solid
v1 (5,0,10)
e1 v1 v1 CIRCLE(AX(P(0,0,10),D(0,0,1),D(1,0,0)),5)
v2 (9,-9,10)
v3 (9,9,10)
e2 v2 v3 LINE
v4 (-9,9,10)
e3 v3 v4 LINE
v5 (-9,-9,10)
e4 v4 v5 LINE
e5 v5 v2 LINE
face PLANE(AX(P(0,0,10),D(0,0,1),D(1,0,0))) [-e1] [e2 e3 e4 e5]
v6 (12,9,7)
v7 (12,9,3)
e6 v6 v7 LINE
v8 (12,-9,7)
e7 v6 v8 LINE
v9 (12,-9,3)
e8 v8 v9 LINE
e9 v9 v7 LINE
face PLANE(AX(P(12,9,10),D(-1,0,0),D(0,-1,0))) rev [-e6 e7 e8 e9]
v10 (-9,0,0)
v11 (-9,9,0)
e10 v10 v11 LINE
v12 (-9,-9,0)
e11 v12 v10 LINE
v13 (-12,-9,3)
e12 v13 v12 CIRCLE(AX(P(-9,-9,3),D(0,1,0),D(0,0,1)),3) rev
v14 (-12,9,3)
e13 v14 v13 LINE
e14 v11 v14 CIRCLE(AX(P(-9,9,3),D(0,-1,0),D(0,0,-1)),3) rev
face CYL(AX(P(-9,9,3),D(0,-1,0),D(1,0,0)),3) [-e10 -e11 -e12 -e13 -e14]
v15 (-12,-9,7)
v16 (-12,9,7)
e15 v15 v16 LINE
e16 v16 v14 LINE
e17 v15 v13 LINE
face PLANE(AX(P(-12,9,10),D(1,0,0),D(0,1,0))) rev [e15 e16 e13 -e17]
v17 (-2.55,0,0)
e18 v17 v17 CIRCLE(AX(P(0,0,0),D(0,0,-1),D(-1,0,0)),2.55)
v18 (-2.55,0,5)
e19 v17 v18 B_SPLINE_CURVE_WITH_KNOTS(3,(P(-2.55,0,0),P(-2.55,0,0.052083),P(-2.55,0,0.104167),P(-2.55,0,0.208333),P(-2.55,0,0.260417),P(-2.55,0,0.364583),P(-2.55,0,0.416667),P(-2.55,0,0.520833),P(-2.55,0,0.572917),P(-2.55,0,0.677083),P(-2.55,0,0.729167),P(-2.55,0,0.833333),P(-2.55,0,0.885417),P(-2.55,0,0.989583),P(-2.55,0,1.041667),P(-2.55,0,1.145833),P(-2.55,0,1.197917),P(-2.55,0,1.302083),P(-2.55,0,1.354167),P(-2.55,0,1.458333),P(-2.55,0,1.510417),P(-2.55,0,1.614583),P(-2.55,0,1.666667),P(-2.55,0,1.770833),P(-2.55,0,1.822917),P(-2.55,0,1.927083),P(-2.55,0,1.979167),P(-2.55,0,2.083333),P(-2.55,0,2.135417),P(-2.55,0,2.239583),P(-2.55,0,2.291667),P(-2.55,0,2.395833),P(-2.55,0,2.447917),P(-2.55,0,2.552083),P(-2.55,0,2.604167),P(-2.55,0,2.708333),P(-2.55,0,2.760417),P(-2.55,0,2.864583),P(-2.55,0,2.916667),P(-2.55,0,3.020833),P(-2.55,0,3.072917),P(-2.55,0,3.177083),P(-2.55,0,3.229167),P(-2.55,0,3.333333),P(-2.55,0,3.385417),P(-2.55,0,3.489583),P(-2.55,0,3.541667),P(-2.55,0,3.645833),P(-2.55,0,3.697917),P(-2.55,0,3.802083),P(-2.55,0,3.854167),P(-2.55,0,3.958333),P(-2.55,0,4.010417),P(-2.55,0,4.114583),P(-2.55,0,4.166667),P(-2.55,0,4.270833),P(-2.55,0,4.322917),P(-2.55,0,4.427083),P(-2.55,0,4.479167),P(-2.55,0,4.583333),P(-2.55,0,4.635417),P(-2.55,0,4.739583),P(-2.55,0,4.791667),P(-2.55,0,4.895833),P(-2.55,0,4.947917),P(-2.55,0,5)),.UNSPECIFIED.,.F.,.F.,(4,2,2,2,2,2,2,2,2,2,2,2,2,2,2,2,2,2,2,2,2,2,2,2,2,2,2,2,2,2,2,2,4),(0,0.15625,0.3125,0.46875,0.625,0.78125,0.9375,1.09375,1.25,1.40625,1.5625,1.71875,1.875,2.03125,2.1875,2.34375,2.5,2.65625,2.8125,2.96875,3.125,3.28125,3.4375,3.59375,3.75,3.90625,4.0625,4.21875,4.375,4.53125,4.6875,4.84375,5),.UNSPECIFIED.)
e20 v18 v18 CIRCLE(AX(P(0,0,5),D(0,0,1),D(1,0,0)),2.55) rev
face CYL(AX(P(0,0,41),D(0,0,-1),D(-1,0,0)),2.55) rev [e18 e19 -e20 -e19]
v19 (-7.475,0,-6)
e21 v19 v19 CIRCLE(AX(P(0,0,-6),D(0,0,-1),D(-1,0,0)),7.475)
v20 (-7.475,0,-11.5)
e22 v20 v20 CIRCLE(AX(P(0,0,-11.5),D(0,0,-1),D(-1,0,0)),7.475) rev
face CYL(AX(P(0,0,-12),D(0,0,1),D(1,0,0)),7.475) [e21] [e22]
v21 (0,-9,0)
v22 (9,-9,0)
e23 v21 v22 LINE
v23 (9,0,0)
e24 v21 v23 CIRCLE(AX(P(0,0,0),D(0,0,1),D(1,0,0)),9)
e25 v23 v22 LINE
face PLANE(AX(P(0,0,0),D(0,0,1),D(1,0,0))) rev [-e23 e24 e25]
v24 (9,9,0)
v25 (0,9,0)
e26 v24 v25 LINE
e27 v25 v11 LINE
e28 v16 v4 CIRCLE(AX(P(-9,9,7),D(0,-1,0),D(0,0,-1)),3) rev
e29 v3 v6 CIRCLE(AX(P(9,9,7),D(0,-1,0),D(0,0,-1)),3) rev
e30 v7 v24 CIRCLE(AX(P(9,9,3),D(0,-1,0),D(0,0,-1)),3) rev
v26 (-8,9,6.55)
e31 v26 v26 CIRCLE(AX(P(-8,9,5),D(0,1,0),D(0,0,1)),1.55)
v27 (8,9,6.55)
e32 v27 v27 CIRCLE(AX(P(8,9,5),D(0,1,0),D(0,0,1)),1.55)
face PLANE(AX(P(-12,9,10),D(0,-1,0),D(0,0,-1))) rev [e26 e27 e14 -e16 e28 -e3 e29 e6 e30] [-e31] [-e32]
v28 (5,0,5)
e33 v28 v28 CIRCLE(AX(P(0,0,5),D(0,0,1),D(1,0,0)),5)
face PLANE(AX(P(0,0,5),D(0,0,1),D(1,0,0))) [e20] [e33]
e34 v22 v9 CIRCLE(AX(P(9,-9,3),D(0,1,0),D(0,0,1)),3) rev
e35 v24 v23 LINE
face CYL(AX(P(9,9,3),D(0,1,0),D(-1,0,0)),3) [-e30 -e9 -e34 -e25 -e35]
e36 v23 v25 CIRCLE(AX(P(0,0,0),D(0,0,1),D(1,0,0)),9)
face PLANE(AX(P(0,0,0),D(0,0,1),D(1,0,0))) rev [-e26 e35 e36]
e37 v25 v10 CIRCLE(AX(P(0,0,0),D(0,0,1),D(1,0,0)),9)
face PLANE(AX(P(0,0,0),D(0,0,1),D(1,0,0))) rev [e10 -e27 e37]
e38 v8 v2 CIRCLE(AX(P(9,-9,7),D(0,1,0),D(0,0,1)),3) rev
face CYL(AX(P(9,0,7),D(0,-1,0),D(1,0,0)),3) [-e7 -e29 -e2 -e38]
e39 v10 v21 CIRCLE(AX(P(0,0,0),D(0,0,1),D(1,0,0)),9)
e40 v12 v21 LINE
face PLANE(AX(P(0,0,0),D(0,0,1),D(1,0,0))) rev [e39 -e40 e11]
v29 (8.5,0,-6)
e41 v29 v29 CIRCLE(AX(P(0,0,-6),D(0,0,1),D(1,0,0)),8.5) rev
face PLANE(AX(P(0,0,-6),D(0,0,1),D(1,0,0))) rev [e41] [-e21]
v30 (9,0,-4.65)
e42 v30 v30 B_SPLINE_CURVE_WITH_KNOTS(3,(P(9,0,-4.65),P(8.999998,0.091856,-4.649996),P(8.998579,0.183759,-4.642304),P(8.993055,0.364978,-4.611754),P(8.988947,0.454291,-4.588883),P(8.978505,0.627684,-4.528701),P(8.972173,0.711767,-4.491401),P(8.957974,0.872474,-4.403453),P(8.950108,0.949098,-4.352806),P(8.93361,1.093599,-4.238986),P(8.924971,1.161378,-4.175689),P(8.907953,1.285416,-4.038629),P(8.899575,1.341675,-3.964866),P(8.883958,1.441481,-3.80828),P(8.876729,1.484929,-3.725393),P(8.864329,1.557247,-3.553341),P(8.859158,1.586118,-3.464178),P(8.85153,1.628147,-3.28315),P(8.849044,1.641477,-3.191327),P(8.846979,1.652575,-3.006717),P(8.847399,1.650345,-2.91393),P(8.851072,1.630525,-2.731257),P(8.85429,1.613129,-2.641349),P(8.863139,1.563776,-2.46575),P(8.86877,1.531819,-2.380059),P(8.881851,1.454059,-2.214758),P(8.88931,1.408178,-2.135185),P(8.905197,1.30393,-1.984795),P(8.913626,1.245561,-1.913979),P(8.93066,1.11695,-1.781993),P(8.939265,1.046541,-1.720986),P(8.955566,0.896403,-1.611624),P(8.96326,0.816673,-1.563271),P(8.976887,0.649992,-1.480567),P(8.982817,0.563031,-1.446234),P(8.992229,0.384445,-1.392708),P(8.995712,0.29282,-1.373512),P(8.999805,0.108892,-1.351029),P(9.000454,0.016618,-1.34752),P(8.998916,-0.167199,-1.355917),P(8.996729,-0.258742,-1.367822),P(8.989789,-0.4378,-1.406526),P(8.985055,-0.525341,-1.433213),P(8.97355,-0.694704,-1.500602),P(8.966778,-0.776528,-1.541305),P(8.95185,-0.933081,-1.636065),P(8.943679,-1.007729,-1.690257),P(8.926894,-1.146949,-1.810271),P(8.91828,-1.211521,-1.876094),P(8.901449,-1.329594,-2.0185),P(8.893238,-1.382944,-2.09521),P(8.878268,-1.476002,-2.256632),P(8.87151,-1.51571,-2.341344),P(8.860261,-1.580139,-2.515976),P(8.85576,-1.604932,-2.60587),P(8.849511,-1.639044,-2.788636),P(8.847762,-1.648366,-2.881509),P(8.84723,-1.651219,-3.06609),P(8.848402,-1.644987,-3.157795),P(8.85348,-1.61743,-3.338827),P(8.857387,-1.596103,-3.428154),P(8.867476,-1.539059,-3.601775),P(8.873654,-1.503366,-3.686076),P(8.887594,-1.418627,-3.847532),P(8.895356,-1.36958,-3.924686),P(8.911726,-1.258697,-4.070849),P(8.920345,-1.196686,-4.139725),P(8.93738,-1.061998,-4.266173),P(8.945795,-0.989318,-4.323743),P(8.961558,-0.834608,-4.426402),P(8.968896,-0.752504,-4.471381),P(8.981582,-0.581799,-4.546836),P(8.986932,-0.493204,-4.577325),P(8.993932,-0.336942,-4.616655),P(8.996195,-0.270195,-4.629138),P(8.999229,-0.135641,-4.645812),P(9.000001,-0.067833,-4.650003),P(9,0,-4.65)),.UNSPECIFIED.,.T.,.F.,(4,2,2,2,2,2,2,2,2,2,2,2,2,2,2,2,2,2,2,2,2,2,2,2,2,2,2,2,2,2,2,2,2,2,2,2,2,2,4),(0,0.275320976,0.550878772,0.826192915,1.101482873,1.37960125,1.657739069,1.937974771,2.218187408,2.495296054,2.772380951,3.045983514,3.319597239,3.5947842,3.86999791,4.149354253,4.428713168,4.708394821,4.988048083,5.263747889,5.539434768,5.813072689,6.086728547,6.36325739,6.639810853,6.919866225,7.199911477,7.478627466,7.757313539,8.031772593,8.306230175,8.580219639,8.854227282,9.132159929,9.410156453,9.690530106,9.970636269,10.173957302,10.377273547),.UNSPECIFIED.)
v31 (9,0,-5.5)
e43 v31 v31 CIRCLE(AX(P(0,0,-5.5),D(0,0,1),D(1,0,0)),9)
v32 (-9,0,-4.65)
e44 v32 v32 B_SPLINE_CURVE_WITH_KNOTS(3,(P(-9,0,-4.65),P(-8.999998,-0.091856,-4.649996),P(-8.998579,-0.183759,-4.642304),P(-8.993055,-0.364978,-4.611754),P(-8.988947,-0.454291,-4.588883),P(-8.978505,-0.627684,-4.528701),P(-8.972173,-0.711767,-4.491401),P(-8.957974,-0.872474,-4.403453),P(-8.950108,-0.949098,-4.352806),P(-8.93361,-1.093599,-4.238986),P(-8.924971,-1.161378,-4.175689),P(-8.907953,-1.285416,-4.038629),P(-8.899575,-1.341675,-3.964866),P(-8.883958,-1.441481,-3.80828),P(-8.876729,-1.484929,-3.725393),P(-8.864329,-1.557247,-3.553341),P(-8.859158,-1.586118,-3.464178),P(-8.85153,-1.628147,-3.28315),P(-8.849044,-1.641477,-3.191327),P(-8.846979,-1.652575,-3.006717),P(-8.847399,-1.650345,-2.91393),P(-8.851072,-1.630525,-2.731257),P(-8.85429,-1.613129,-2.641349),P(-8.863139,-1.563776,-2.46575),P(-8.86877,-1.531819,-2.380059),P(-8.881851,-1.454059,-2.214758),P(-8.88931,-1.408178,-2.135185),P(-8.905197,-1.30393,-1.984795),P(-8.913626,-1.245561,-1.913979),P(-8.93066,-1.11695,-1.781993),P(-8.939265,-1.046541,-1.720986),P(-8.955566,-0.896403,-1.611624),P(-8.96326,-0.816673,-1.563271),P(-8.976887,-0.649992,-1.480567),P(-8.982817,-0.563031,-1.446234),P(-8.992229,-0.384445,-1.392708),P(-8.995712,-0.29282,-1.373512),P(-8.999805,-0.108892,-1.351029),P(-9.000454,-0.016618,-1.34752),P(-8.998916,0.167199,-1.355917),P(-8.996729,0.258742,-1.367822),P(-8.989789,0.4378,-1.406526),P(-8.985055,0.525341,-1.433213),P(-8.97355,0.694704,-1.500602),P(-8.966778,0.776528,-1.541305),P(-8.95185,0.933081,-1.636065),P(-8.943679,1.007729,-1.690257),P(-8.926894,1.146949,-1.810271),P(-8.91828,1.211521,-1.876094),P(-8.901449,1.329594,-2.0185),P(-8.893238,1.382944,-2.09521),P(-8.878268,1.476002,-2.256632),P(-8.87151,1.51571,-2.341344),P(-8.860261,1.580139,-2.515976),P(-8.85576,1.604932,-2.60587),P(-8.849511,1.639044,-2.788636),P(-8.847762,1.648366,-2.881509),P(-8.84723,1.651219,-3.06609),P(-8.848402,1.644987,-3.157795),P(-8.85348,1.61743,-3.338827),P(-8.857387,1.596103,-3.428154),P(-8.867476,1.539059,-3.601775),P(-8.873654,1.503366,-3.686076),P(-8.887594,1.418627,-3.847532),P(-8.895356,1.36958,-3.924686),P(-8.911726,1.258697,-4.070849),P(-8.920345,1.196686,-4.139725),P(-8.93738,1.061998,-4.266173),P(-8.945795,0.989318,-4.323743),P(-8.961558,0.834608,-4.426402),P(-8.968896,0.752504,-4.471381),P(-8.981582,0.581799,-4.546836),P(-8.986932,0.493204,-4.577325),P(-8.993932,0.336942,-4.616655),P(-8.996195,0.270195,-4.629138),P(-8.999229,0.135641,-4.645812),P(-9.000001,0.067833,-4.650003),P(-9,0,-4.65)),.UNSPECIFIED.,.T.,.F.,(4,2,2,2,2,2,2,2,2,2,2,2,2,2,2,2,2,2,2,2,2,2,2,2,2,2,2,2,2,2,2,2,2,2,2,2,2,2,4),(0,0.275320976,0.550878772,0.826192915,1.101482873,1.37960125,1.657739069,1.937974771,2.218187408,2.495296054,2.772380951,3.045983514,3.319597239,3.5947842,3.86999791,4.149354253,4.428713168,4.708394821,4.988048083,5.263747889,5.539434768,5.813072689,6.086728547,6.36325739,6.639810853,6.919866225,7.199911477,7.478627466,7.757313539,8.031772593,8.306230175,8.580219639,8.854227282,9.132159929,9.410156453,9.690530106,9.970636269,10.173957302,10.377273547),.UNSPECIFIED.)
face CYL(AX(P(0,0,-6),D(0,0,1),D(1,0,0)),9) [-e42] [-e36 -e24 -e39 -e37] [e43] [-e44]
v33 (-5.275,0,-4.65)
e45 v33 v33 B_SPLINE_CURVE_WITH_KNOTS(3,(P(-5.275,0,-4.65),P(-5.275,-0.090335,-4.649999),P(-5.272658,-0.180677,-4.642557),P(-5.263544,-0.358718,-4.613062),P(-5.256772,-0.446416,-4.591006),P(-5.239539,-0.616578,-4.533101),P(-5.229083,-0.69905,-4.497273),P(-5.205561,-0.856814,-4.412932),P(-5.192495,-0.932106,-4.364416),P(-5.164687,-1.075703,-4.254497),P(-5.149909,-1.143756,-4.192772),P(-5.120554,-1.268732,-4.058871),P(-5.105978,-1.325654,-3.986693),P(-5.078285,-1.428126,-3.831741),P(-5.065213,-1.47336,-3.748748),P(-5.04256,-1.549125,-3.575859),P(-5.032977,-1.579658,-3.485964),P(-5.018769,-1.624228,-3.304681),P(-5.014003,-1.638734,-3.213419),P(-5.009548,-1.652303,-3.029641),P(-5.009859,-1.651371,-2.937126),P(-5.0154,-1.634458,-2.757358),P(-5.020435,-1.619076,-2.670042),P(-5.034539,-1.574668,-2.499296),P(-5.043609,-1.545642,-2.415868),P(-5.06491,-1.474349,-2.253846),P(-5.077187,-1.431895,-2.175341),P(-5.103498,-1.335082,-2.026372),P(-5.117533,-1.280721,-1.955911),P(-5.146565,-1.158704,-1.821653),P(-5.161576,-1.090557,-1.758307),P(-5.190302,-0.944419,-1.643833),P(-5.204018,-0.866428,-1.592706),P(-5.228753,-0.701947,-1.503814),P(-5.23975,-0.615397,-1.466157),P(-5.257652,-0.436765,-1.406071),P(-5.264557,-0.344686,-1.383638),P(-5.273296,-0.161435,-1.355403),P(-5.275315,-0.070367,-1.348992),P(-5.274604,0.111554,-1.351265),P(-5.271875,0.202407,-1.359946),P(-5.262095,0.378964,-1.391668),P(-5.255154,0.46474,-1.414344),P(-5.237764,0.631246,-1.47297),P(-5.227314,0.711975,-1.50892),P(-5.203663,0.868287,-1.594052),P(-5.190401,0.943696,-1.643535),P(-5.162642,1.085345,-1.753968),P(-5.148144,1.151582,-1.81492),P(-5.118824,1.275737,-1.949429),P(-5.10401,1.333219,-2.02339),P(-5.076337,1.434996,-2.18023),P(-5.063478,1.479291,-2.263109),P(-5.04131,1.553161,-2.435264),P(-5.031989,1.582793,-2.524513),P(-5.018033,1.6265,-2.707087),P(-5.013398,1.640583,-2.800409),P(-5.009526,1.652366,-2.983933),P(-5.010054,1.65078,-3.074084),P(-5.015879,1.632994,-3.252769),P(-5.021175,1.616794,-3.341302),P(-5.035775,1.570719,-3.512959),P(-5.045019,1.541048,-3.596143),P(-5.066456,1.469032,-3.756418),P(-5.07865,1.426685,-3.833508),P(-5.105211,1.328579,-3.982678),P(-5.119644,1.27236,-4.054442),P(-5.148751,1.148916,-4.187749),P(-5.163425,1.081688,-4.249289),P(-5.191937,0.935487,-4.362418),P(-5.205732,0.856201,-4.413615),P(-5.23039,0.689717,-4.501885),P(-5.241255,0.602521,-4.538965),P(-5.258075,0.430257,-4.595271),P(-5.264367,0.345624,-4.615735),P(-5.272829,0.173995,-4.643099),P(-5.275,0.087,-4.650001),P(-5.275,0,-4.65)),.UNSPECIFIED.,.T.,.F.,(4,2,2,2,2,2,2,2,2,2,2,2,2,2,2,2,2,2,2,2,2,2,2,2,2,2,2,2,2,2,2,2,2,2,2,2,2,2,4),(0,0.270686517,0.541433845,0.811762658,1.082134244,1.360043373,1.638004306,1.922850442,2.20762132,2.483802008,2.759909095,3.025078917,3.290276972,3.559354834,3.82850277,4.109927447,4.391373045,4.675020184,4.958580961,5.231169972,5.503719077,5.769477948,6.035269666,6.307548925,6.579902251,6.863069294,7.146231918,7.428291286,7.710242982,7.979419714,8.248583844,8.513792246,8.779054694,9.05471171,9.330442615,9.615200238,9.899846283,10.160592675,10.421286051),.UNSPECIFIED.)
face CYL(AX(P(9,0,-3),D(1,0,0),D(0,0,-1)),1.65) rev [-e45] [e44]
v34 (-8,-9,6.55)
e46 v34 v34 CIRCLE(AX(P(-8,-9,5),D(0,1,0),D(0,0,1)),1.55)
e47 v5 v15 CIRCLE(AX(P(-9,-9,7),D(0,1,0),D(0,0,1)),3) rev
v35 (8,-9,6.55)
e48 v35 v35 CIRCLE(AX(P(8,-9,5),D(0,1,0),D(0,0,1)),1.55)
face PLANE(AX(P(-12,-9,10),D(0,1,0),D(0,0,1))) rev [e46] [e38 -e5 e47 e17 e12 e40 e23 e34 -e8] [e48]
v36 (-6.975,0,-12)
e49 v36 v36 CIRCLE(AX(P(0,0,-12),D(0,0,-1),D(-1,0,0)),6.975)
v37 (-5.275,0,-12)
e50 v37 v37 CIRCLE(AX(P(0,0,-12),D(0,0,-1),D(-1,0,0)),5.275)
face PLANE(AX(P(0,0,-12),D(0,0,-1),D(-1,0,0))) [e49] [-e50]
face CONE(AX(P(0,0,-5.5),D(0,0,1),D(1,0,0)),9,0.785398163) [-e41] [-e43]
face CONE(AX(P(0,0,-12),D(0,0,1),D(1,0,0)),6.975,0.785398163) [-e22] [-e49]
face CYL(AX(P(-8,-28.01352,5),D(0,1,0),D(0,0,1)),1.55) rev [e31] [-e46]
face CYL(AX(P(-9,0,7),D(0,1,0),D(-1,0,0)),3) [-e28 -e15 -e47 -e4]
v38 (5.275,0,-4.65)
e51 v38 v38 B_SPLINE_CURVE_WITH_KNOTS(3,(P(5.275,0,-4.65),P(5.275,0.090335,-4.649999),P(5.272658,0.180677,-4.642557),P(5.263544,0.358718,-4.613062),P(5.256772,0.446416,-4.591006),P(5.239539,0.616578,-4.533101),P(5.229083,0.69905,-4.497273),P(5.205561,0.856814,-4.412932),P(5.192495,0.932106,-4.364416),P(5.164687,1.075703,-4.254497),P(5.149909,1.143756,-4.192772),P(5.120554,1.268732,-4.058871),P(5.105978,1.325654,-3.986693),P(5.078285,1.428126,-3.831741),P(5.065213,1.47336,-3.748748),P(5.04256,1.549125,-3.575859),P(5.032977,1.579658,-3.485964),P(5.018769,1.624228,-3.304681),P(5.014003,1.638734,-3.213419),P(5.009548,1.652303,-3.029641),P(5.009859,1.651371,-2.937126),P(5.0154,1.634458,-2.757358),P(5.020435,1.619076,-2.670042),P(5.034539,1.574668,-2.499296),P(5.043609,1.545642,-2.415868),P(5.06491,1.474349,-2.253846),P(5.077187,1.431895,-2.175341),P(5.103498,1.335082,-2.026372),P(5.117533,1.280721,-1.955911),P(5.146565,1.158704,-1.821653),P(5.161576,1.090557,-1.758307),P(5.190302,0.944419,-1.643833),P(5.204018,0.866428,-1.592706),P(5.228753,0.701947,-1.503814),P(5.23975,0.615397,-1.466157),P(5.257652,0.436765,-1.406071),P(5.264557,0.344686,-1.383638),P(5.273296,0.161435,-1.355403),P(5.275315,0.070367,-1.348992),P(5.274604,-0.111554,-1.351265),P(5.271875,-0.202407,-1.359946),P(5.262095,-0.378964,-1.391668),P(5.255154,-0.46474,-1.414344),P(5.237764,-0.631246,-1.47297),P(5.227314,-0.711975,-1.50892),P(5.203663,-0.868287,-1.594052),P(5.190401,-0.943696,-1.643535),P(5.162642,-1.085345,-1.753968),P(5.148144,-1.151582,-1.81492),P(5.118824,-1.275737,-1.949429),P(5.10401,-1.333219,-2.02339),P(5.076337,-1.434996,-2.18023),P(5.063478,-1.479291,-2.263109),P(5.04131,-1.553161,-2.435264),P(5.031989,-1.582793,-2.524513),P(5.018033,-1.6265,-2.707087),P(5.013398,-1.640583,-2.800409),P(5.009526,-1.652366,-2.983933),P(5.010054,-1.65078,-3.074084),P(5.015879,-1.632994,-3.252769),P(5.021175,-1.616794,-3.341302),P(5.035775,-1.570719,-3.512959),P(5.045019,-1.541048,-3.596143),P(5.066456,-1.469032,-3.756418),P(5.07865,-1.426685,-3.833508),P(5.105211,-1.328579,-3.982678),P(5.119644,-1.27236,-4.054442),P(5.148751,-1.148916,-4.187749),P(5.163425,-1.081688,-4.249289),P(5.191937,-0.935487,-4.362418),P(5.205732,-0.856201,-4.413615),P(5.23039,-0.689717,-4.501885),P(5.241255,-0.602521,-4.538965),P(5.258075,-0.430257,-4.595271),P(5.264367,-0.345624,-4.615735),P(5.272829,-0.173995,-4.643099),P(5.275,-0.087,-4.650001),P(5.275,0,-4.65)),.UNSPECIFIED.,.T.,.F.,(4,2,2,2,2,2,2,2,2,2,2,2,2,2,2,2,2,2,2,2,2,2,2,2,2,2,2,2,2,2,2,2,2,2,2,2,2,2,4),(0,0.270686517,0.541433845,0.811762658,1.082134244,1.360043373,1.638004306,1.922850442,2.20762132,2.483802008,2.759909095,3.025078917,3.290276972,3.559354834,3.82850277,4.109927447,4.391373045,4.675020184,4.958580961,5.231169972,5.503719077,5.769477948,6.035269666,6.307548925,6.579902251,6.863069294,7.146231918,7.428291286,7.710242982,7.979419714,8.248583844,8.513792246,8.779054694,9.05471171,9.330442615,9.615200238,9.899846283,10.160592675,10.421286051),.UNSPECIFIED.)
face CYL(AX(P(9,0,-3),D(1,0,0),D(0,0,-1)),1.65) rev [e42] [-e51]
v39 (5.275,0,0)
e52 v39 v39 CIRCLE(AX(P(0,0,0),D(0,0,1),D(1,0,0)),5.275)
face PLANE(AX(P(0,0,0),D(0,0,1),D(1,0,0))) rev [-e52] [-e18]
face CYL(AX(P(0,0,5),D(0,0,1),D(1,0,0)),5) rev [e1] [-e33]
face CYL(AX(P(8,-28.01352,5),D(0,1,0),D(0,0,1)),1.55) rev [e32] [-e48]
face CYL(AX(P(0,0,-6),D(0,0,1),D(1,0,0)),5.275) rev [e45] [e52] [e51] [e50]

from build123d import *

# Parameters (mm, degrees)
SKETCH_1_W            = 24
SKETCH_1_H            = 18
EXTRUDE_1_DEPTH       = 10
SKETCH_2_R            = 9
SKETCH_2_R_2          = 5.275
EXTRUDE_2_DEPTH       = 6
SKETCH_3_R            = 2.55
CUT_EXTRUDE_1_DEPTH   = 41
SKETCH_4_R            = 1.55
CUT_EXTRUDE_2_DEPTH   = 37.013519789
M4_TAPPED_HOLE1_D     = 3.3
M4_TAPPED_HOLE1_DEPTH = 23.5
M4_TAPPED_HOLE1_TIP   = 0.991420021
SKETCH2_R             = 7.475
SKETCH2_R_2           = 5.275
BOSS_EXTRUDE1_DEPTH   = 6
CHAMFER1_SIZE         = 0.5
SKETCH3_R             = 5
CUT_EXTRUDE1_DEPTH    = 5
FILLET1_R             = 3


with BuildPart() as part:
    # 草图1 → 凸台-拉伸1 (new body)
    with BuildSketch(Plane.XY):
        Rectangle(SKETCH_1_W, SKETCH_1_H)
    extrude(amount=EXTRUDE_1_DEPTH)

    # 草图2 → 凸台-拉伸2 (add)
    with BuildSketch(Plane.XY):
        Circle(SKETCH_2_R)
        Circle(SKETCH_2_R_2, mode=Mode.SUBTRACT)
    extrude(amount=-EXTRUDE_2_DEPTH)

    # 草图3 → 切除-拉伸1 (cut)
    with BuildSketch(Plane(origin=(0, 0, 0), x_dir=(-1, 0, 0), z_dir=(0, 0, -1))):
        Circle(SKETCH_3_R)
    extrude(amount=-CUT_EXTRUDE_1_DEPTH, mode=Mode.SUBTRACT)

    # 草图4 → 切除-拉伸2 (cut)
    with BuildSketch(Plane(origin=(0, 9, 0), x_dir=(1, 0, 0), z_dir=(0, 1, 0))):
        with Locations(Location((-8, -5, 0), (0, 0, 270))):
            Circle(SKETCH_4_R)
        with Locations(Location((8, -5, 0), (0, 0, 270))):
            Circle(SKETCH_4_R)
    extrude(amount=-CUT_EXTRUDE_2_DEPTH, mode=Mode.SUBTRACT)

    # M4 Tapped Hole1
    with Locations(Plane(origin=(9, 0, 0), x_dir=(0, 0, -1), z_dir=(1, 0, 0))):
        with Locations((3, 0)):
            Hole(M4_TAPPED_HOLE1_D / 2, depth=M4_TAPPED_HOLE1_DEPTH)
            with Locations((0, 0, -(M4_TAPPED_HOLE1_DEPTH + M4_TAPPED_HOLE1_TIP / 2))):  # 118° drill point
                Cone(0, M4_TAPPED_HOLE1_D / 2, M4_TAPPED_HOLE1_TIP, mode=Mode.SUBTRACT)

    # Sketch2 → Boss-Extrude1 (add)
    with BuildSketch(Plane(origin=(0, 0, -6), x_dir=(-1, 0, 0), z_dir=(0, 0, -1))):
        Circle(SKETCH2_R)
        with Locations(Location((0, 0, 0), (0, 0, 180))):
            Circle(SKETCH2_R_2, mode=Mode.SUBTRACT)
    extrude(amount=BOSS_EXTRUDE1_DEPTH)

    # Chamfer1
    chamfer1_edges = [part.edges().sort_by_distance(p)[0] for p in [
        (-9, 0, -6),
        (7.475, 0, -12),
    ]]
    chamfer(chamfer1_edges, length=CHAMFER1_SIZE)

    # Sketch3 → Cut-Extrude1 (cut)
    with BuildSketch(Plane.XY.offset(10)):
        Circle(SKETCH3_R)
    extrude(amount=-CUT_EXTRUDE1_DEPTH, mode=Mode.SUBTRACT)

    # Fillet1
    fillet1_edges = [part.edges().sort_by_distance(p)[0] for p in [
        (-12, 0, 10),
        (12, 0, 10),
        (-12, 0, 0),
        (12, 0, 0),
    ]]
    fillet(fillet1_edges, radius=FILLET1_R - 0.0001)  # a hair under: the kernel refuses the full size


solid = part.part
